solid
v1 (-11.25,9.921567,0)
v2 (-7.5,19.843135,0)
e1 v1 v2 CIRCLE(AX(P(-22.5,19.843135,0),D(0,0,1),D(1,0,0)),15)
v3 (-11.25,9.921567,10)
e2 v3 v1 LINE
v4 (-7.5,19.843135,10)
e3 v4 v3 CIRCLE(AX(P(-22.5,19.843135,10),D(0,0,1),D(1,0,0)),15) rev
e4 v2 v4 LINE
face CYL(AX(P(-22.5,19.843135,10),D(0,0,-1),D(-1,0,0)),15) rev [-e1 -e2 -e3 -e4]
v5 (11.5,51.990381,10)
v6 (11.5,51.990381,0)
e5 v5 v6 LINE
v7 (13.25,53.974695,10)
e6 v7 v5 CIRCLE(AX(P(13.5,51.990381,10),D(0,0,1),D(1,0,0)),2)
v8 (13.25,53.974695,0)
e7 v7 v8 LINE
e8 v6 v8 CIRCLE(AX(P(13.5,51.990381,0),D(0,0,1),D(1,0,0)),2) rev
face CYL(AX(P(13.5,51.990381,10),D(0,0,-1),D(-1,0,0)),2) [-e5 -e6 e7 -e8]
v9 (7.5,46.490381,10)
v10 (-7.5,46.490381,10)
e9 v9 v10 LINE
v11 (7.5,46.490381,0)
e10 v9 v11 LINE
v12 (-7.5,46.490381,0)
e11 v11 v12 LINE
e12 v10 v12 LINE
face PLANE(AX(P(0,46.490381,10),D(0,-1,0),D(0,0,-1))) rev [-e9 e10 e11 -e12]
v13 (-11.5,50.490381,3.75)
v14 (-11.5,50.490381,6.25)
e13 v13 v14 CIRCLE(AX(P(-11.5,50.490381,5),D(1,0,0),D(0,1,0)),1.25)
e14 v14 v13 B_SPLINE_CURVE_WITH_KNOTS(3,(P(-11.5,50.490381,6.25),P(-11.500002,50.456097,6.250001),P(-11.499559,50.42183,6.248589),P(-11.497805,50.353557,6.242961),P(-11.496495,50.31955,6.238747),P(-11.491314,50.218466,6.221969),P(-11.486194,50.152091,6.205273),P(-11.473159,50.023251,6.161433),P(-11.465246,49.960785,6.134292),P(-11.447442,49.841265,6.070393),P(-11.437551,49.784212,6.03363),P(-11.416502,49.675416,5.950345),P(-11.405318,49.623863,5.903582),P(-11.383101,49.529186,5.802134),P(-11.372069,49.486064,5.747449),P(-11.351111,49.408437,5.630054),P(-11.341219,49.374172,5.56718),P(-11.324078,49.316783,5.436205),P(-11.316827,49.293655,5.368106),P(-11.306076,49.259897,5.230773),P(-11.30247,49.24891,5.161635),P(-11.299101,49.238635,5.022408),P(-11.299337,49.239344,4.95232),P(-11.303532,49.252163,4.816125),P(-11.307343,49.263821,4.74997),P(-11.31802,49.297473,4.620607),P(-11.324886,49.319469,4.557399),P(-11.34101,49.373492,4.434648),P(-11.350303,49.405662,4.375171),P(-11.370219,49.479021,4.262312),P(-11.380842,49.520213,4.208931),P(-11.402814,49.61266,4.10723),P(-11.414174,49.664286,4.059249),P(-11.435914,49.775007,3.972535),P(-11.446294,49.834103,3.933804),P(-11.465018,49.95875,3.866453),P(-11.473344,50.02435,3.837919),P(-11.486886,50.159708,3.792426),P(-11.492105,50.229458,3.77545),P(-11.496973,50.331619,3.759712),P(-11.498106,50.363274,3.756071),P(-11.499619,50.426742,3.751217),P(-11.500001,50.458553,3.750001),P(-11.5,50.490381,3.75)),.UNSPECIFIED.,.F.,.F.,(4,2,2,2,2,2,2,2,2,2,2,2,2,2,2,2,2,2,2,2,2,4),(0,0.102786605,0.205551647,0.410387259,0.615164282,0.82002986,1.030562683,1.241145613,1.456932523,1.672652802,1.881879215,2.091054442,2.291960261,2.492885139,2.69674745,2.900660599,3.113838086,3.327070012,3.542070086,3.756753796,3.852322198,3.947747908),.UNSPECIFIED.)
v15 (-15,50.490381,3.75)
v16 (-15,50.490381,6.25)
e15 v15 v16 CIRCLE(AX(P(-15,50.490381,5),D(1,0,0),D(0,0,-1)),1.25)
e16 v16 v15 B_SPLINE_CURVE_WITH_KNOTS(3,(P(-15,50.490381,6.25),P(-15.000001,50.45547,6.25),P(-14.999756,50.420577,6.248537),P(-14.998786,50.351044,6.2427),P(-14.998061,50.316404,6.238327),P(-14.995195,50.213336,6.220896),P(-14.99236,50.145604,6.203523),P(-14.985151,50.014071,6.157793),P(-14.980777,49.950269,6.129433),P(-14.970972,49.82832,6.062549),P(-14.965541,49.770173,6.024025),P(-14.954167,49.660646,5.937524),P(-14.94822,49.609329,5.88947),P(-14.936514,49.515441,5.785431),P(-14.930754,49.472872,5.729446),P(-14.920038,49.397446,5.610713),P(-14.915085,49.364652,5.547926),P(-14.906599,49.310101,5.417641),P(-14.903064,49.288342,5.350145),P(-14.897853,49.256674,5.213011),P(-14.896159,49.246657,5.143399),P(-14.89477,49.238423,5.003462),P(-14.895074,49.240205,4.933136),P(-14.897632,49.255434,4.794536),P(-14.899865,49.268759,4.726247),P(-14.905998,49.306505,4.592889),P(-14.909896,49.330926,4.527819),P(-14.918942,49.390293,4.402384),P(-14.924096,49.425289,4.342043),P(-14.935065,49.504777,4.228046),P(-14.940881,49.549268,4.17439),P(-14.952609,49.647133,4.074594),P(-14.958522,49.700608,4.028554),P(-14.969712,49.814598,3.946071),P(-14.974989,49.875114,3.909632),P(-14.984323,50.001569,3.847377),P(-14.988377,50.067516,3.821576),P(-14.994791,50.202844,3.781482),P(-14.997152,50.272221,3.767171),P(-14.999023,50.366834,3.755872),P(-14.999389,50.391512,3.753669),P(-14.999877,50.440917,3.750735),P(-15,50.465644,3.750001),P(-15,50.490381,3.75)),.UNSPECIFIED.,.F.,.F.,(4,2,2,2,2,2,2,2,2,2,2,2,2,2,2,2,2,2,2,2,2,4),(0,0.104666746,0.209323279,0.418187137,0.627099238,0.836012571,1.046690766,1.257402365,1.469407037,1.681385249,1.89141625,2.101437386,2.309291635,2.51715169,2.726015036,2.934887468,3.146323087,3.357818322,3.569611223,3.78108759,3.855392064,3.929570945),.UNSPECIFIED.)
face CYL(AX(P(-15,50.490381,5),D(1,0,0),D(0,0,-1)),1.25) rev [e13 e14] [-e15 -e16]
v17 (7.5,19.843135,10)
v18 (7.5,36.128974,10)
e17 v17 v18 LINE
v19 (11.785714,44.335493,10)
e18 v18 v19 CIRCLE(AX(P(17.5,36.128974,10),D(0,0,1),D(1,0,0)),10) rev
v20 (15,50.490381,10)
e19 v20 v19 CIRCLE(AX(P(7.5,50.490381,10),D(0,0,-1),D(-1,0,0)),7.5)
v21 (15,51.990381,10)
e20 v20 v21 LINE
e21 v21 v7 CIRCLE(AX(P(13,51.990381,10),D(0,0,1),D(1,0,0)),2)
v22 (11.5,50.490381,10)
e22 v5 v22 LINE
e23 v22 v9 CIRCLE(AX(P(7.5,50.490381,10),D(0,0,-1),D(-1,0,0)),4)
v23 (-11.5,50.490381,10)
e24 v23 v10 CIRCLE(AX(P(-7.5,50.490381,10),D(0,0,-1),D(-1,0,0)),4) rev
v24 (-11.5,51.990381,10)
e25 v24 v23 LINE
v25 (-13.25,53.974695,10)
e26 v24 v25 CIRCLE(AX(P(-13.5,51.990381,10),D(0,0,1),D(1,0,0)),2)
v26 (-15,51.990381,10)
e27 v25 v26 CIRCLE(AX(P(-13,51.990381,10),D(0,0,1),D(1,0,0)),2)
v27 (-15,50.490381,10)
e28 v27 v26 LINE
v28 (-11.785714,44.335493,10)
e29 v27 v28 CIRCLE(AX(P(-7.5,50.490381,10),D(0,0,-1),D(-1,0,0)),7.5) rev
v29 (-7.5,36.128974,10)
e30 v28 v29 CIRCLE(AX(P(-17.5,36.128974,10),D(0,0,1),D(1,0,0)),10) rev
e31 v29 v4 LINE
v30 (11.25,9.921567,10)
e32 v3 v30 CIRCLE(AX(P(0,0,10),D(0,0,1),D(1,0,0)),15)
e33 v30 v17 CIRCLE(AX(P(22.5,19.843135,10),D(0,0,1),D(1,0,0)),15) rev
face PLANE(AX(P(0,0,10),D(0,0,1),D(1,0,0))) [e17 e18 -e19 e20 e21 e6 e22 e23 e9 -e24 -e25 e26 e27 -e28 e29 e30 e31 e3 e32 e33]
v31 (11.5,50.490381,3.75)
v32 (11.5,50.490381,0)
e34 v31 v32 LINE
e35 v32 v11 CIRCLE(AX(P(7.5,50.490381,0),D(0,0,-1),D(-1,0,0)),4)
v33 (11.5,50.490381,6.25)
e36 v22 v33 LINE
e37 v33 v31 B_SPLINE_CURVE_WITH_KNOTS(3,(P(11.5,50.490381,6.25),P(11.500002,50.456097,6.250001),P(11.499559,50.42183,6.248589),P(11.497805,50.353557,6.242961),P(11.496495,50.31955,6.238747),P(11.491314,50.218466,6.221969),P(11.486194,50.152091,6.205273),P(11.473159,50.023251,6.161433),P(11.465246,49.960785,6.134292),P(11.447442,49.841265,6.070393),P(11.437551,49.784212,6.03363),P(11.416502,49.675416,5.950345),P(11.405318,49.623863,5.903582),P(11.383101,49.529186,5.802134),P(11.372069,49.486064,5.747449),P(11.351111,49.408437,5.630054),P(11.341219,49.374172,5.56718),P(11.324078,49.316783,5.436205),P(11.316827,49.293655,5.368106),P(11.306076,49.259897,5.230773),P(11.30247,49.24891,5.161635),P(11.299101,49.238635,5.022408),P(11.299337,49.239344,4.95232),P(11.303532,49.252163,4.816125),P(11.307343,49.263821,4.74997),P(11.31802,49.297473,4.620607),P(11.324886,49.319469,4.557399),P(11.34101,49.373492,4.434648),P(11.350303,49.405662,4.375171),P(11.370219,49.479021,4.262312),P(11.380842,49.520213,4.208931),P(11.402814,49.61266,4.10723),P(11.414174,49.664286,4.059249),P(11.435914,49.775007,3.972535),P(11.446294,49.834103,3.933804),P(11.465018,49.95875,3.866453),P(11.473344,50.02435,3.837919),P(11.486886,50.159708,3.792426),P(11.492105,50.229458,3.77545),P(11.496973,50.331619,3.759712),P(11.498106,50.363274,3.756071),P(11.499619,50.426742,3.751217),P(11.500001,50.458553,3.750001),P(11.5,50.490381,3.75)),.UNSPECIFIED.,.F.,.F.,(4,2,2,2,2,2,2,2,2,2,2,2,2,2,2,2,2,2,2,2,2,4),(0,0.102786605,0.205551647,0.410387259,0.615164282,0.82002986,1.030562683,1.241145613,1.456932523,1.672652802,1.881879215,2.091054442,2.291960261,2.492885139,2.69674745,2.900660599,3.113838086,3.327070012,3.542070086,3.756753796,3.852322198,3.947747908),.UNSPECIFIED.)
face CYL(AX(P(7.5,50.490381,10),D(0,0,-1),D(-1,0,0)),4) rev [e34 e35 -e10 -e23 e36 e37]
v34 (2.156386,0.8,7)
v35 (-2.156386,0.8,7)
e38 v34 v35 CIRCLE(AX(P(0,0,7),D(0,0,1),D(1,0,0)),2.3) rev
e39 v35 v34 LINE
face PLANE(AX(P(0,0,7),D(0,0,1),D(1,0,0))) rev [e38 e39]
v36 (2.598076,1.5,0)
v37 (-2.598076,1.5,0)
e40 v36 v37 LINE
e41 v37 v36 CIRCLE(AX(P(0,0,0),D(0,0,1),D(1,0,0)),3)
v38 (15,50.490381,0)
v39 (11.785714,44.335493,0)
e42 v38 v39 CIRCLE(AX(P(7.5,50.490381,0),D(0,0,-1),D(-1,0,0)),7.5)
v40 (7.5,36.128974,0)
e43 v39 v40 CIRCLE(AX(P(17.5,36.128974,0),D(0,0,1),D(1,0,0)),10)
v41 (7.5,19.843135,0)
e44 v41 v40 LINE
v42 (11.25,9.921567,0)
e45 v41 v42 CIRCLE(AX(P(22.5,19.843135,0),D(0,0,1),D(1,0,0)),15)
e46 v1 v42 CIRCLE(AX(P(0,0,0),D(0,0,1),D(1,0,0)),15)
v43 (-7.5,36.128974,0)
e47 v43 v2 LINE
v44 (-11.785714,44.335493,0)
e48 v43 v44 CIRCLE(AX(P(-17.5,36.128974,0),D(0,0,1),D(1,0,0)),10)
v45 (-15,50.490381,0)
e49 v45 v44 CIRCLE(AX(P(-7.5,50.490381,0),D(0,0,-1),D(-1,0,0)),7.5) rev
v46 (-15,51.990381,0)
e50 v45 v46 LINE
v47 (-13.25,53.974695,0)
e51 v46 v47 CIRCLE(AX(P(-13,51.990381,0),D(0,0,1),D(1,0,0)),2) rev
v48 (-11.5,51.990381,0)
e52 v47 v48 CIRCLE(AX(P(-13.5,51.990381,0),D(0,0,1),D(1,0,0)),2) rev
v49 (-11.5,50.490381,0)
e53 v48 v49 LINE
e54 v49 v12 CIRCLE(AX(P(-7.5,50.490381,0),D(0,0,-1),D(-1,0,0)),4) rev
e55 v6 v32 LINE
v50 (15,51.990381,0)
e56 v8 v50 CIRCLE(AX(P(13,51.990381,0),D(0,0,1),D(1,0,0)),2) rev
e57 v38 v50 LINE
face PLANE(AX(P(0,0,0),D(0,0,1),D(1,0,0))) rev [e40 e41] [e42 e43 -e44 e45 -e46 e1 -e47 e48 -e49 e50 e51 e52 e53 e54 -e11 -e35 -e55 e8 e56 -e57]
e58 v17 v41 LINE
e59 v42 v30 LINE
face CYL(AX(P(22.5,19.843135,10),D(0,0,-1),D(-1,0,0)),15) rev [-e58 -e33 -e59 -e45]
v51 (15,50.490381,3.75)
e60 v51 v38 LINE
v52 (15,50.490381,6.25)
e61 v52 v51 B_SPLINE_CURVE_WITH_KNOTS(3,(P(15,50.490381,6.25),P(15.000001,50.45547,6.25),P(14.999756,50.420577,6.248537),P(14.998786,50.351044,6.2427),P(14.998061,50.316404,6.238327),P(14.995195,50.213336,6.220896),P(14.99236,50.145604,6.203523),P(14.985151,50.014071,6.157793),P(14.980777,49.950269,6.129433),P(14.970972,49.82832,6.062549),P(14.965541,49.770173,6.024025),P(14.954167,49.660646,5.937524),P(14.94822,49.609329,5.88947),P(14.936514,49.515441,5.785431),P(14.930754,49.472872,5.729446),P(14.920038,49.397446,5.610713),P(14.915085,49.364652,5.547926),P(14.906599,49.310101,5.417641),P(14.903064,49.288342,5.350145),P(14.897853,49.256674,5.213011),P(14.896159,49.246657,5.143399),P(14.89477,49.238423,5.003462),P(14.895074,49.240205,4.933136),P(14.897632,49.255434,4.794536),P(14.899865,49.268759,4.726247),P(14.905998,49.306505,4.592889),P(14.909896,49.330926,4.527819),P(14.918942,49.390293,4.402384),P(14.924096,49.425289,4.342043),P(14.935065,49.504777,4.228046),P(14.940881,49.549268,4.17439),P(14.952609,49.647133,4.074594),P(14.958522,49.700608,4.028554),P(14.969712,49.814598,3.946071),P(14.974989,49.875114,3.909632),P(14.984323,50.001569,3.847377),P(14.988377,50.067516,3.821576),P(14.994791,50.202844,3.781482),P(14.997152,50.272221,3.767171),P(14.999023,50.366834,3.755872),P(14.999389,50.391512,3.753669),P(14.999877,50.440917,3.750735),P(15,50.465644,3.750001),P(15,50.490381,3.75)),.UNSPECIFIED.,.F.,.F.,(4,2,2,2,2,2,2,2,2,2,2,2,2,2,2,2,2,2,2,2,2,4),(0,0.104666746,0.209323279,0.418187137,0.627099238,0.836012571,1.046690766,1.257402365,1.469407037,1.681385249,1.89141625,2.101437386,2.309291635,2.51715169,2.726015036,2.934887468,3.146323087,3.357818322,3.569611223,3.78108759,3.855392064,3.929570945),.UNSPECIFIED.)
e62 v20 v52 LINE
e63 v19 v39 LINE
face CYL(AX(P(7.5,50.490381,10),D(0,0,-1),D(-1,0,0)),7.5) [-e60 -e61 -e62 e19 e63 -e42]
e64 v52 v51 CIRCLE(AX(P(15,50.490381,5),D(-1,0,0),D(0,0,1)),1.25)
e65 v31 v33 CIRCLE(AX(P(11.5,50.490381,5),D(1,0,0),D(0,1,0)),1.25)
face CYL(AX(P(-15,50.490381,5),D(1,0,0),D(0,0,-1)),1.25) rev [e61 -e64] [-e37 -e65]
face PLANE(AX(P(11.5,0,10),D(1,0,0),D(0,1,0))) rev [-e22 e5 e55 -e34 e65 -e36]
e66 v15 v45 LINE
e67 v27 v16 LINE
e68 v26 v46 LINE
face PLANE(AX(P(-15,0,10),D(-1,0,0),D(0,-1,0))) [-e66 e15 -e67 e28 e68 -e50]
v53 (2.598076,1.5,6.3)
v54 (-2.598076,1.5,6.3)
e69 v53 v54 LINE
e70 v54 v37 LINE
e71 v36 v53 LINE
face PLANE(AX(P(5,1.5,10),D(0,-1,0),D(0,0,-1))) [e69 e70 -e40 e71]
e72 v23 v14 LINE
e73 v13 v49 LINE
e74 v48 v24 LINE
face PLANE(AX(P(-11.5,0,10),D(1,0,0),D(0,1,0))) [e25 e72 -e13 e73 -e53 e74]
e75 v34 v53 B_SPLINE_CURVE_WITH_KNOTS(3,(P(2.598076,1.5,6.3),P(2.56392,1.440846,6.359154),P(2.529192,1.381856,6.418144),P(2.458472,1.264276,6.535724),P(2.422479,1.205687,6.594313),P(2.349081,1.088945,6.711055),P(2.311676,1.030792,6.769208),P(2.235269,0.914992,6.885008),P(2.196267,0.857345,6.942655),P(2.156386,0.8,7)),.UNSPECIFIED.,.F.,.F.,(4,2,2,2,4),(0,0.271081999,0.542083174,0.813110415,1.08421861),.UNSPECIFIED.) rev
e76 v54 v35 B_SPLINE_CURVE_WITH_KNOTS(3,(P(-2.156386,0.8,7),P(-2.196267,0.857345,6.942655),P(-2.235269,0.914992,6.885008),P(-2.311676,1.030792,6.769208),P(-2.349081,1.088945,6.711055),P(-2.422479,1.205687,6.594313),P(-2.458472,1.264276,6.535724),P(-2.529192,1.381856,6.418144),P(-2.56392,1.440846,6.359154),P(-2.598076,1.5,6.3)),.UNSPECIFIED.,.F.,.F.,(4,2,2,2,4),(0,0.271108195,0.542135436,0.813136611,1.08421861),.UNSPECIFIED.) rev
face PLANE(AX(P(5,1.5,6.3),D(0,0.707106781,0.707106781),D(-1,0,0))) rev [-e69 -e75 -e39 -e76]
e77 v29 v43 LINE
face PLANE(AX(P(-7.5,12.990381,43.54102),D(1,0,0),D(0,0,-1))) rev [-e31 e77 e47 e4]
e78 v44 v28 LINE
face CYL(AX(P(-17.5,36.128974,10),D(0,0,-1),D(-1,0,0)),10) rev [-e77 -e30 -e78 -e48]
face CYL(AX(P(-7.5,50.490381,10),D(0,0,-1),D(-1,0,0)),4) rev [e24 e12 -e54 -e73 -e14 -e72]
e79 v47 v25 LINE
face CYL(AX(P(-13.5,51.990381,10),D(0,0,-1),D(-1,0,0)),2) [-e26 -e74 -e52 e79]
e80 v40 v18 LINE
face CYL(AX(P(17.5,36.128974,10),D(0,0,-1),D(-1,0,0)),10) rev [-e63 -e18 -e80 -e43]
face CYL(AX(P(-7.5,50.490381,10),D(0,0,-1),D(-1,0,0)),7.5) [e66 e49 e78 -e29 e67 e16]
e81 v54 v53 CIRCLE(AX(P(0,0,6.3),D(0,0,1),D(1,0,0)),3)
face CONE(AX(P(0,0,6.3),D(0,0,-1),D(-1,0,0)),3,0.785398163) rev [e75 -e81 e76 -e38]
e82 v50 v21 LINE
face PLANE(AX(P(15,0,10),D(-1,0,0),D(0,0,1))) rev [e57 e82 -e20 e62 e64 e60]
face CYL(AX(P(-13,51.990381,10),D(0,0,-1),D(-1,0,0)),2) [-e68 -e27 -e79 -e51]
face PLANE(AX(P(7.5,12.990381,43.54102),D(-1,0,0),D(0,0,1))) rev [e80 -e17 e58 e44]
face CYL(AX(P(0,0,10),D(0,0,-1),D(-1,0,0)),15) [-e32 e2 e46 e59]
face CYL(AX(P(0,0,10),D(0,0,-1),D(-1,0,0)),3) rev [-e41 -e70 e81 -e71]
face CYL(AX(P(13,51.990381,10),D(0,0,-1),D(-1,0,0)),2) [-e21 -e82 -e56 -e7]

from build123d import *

# Parameters (mm, degrees)
SKETCH1_R               = 15
SKETCH1_R_2             = 3
BOSS_EXTRUDE1_DEPTH     = 10
SKETCH2_W               = 15
SKETCH2_H               = 30
BOSS_EXTRUDE2_DEPTH     = 10
FILLET1_R               = 15
SKETCH5_W               = 10
SKETCH5_H               = 2
BOSS_EXTRUDE3_DEPTH     = 10
BOSS_EXTRUDE4_START     = -3
SKETCH7_R               = 3
BOSS_EXTRUDE4_DEPTH     = 3
CHAMFER1_SIZE           = 0.7
BOSS_EXTRUDE6_DEPTH     = 10
FILLET4_R               = 2
FILLET2_R               = 10
CUT_EXTRUDE1_DEPTH      = 63.556116013
CUT_EXTRUDE1_DEPTH_BACK = 63.556116013
SKETCH10_R              = 1.25


with BuildPart() as part:
    # Sketch1 → Boss-Extrude1 (new body)
    with BuildSketch(Plane.XY):
        Circle(SKETCH1_R)
        Circle(SKETCH1_R_2, mode=Mode.SUBTRACT)
    extrude(amount=BOSS_EXTRUDE1_DEPTH)

    # Sketch2 → Boss-Extrude2 (add)
    with BuildSketch(Plane.XY):
        with Locations((0, 27.990381057)):
            Rectangle(SKETCH2_W, SKETCH2_H)
    extrude(amount=BOSS_EXTRUDE2_DEPTH)

    # Fillet1
    fillet1_edges = [part.edges().sort_by_distance(p)[0] for p in [
        (-7.5, 12.990381057, 5),
        (7.5, 12.990381057, 5),
    ]]
    fillet(fillet1_edges, radius=FILLET1_R)

    # Sketch5 → Boss-Extrude3 (add)
    with BuildSketch(Plane(origin=(0, 0, 0), x_dir=(-1, 0, 0), z_dir=(0, 0, -1))):
        with Locations((0, 2.5)):
            Rectangle(SKETCH5_W, SKETCH5_H)
    extrude(amount=-BOSS_EXTRUDE3_DEPTH)

    # Sketch7 → Boss-Extrude4 (add)
    with BuildSketch(Plane.XY.offset(10).offset(BOSS_EXTRUDE4_START)):
        Circle(SKETCH7_R)
    extrude(amount=BOSS_EXTRUDE4_DEPTH)

    # Chamfer1
    chamfer1_edges = [part.edges().sort_by_distance(p)[0] for p in [
        (0, 1.5, 7),
        (0, -3, 7),
    ]]
    chamfer(chamfer1_edges, length=CHAMFER1_SIZE)

    # Sketch9 → Boss-Extrude6 (add)
    with BuildSketch(Plane(origin=(0, 0, 0), x_dir=(-1, 0, 0), z_dir=(0, 0, -1))):
        with BuildLine():
            Line((-15, 53.990381057), (-15, 50.490381057))
            ThreePointArc((-15, 50.490381057), (-12.803300859, 45.187080198), (-7.5, 42.990381057))
            Line((-7.5, 42.990381057), (0, 42.990381057))
            Line((0, 42.990381057), (0, 46.490381057))
            Line((0, 46.490381057), (-7.5, 46.490381057))
            ThreePointArc((-7.5, 46.490381057), (-10.328427125, 47.661953932), (-11.5, 50.490381057))
            Line((-11.5, 50.490381057), (-11.5, 53.990381057))
            Line((-11.5, 53.990381057), (-15, 53.990381057))
        make_face()
        with BuildLine():
            Line((0, 46.490381057), (0, 42.990381057))
            Line((0, 42.990381057), (7.5, 42.990381057))
            ThreePointArc((7.5, 42.990381057), (12.803300859, 45.187080198), (15, 50.490381057))
            Line((15, 50.490381057), (15, 53.990381057))
            Line((15, 53.990381057), (11.5, 53.990381057))
            Line((11.5, 53.990381057), (11.5, 50.490381057))
            ThreePointArc((11.5, 50.490381057), (10.328427125, 47.661953932), (7.5, 46.490381057))
            Line((7.5, 46.490381057), (0, 46.490381057))
        make_face()
    extrude(amount=-BOSS_EXTRUDE6_DEPTH)

    # Fillet4
    # the kernel refuses this fillet: 2 mm, written as the material it takes off along each edge
    with BuildSketch(Plane(origin=(11.5, 53.990381057, -5), x_dir=(0, -1, 0), z_dir=(0, 0, 1)), Plane(origin=(15, 53.990381057, -5), x_dir=(-1, 0, 0), z_dir=(0, 0, 1)), Plane(origin=(-11.5, 53.990381057, -5), x_dir=(-1, 0, 0), z_dir=(0, 0, 1)), Plane(origin=(-15, 53.990381057, -5), x_dir=(0, -1, 0), z_dir=(0, 0, 1))) as fillet4_piece_1:
        with BuildLine():
            CenterArc((FILLET4_R, FILLET4_R), FILLET4_R, 180, 90)
            Line((0, FILLET4_R), (0, 0))
            Line((0, 0), (FILLET4_R, 0))
        make_face()
    extrude(amount=20, mode=Mode.SUBTRACT)

    # Fillet2
    fillet2_edges = [part.edges().sort_by_distance(p)[0] for p in [
        (-7.5, 42.990381057, 5),
        (7.5, 42.990381057, 5),
    ]]
    fillet(fillet2_edges, radius=FILLET2_R)

    # Sketch10 → Cut-Extrude1 (cut, two sides: drawn at the far end of the back side and taken through both)
    with BuildSketch(Plane(origin=(15, 0, 0), x_dir=(0, 0, -1), z_dir=(1, 0, 0)).offset(-CUT_EXTRUDE1_DEPTH_BACK)):
        with Locations((-5, 50.490381057)):
            Circle(SKETCH10_R)
    extrude(amount=CUT_EXTRUDE1_DEPTH + CUT_EXTRUDE1_DEPTH_BACK, mode=Mode.SUBTRACT)


solid = part.part
